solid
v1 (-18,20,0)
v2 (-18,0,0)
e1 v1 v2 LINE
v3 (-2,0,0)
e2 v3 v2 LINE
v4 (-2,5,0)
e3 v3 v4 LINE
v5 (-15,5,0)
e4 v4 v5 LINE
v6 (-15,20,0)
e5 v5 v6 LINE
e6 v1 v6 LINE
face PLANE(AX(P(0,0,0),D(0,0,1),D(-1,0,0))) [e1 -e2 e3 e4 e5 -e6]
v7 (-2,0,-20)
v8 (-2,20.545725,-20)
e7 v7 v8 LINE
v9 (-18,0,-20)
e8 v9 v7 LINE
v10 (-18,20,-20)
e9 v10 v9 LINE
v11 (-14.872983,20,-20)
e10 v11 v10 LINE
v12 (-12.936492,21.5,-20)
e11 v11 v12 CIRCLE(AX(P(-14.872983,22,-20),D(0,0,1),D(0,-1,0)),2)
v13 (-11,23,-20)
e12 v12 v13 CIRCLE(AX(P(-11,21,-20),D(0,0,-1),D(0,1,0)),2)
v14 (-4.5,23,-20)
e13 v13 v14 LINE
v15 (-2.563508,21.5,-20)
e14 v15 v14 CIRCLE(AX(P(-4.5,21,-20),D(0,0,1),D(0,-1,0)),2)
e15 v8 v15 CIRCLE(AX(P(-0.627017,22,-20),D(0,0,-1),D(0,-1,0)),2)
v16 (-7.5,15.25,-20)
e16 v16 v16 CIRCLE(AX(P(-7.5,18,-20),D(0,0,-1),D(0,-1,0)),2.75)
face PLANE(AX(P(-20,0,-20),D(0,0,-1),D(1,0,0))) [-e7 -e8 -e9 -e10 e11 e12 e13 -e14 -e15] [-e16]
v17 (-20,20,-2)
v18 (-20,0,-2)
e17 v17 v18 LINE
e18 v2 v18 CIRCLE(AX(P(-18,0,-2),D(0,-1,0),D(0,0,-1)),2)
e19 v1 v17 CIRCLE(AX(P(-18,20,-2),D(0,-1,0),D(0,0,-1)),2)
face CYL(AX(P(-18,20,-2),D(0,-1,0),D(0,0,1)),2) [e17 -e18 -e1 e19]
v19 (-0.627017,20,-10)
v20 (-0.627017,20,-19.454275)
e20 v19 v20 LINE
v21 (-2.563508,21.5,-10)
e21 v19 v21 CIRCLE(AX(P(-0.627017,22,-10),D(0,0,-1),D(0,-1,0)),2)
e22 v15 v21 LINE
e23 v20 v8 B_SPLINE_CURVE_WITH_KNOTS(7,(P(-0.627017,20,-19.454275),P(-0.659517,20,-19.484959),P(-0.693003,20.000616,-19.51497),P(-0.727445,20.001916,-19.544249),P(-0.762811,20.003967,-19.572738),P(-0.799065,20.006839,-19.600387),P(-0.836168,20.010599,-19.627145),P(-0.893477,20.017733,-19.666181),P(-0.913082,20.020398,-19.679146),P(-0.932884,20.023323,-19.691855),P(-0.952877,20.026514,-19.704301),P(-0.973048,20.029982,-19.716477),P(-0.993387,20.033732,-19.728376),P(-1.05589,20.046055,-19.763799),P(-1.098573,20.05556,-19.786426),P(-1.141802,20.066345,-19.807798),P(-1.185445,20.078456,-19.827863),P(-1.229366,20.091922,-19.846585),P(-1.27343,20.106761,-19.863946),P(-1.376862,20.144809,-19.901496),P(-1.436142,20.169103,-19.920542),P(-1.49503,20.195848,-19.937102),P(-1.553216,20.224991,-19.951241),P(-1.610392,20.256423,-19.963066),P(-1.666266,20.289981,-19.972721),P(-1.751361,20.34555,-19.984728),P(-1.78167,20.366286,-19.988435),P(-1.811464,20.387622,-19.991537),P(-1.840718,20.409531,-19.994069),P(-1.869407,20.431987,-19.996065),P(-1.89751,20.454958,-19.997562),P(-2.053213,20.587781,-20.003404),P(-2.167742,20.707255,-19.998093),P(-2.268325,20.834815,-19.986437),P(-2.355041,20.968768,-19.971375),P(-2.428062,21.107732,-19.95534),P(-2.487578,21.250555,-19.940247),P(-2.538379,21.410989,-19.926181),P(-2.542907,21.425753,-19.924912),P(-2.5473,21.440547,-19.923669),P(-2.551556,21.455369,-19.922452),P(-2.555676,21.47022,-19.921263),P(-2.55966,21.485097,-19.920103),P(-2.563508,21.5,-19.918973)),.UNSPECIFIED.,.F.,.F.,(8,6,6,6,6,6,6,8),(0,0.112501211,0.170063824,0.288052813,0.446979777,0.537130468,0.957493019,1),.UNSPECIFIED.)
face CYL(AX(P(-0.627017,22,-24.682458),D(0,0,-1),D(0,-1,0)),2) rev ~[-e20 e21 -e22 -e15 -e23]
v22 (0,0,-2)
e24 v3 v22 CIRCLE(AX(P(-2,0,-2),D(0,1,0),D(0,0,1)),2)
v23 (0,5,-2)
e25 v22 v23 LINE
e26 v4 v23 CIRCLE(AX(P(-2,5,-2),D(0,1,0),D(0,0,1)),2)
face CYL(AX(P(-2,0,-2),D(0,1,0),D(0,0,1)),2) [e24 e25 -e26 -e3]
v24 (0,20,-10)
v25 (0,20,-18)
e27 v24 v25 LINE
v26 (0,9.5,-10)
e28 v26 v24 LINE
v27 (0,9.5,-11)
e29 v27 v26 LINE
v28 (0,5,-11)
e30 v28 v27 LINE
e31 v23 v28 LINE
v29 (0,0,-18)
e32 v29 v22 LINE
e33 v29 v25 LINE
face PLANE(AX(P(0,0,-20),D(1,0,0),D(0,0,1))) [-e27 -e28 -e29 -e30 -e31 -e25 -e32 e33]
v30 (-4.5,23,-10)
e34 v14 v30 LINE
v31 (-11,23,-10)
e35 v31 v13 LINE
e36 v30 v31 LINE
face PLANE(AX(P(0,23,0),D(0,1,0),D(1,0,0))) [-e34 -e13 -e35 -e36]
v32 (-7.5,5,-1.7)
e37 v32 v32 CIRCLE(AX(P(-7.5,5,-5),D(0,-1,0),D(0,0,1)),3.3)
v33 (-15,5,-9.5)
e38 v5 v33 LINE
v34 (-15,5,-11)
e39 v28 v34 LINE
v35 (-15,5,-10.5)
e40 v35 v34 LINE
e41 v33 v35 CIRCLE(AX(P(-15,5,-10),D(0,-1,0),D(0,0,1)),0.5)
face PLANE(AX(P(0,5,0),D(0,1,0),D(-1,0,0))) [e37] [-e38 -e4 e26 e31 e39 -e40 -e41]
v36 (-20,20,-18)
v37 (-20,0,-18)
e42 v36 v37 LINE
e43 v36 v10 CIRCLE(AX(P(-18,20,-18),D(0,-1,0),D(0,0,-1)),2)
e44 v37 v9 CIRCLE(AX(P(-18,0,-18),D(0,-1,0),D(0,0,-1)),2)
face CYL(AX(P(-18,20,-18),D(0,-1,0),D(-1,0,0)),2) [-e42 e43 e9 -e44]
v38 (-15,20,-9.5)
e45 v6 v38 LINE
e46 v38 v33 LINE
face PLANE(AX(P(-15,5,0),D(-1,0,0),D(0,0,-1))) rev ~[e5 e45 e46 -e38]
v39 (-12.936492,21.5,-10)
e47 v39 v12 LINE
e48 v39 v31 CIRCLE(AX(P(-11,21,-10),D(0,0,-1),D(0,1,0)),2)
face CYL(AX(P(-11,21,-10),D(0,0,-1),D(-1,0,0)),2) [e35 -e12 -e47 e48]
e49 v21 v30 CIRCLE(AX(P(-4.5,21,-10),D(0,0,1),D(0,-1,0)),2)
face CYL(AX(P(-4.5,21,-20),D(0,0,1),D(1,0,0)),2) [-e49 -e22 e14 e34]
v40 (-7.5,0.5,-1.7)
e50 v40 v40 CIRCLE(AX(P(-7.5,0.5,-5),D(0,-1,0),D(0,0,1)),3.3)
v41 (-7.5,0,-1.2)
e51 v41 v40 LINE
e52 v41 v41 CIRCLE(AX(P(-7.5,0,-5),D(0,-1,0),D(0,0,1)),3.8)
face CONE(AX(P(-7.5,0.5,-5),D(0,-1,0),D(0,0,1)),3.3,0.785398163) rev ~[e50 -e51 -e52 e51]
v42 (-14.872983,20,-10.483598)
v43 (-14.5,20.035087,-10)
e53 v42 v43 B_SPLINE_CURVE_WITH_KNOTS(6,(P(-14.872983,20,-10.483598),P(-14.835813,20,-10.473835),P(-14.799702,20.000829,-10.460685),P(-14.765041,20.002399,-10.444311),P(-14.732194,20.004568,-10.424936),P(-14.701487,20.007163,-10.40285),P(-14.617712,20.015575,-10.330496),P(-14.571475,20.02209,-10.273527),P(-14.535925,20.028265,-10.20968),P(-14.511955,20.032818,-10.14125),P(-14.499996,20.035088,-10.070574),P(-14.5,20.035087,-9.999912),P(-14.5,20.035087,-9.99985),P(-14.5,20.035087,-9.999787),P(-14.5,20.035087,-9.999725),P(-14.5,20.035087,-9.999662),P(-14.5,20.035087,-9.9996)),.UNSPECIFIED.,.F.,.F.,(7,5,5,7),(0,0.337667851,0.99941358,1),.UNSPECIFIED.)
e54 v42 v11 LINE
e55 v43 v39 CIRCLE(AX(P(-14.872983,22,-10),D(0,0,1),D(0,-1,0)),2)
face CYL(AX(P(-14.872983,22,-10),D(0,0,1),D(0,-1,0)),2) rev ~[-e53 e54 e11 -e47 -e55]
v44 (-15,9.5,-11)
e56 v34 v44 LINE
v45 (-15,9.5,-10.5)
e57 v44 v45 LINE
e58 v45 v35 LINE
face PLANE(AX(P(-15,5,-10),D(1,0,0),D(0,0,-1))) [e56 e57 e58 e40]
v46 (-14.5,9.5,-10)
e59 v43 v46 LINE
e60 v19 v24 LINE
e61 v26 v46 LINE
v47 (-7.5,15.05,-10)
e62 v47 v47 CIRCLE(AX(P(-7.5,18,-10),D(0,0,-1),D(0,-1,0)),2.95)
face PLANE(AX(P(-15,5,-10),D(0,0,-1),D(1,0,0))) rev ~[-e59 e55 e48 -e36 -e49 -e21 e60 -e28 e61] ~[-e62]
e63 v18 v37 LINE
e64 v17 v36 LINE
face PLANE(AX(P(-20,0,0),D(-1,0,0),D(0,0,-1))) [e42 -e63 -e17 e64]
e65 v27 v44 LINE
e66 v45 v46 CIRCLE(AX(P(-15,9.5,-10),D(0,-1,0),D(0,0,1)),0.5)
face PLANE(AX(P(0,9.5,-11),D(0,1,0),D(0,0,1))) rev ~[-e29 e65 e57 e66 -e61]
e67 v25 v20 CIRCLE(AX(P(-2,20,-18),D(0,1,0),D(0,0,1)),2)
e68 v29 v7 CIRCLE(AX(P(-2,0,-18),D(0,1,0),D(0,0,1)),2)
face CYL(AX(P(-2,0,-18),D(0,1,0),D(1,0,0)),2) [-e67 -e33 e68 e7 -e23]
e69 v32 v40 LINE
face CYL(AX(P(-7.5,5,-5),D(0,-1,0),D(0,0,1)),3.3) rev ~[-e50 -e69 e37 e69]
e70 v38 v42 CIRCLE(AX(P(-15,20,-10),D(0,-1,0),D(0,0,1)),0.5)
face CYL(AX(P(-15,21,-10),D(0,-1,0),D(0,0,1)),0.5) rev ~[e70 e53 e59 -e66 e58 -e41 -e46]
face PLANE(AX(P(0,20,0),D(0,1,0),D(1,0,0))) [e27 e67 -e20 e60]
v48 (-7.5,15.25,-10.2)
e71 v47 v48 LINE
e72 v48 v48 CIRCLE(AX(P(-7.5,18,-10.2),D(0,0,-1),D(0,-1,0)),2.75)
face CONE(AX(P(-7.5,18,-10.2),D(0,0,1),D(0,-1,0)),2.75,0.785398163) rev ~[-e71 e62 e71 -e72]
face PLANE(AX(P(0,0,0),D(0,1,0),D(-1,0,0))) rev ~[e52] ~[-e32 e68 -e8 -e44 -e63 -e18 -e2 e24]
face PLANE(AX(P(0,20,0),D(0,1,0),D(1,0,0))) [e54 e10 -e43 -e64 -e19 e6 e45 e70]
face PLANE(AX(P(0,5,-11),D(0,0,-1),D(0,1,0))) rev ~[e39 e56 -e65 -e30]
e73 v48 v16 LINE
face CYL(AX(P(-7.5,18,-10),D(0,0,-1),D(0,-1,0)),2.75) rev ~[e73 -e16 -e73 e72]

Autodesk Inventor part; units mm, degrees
ref_plane "YZ Plane" through (0, 0, 0) normal (1, 0, 0) x (0, 1, 0)
ref_plane "XZ Plane" through (0, 0, 0) normal (0, 1, 0) x (-1, 0, 0)
sketch "Sketch1" plane through (0, 0, 0) normal (0, 1, 0) x (-1, 0, 0)
  line L0 (0, 0) -> (20, 0)
  line L1 (20, 0) -> (20, -20)
  line L2 (20, -20) -> (0, -20)
  line L3 (0, -20) -> (0, 0)
  dimension "d0" = 20
  dimension "d1" = 20
extrude "Extrusion1" add sketch "Sketch1" along normal blind 5
sketch "Sketch2" plane through (0, 5, 0) normal (0, 1, 0) x (1, 0, 0)
  line L0 (0, 0) -> (0, 20) projected
  line L1 (-20, 0) -> (0, 0) projected
  point P0 (-7.5, 5)
  dimension "d4" = 7.5
  dimension "d55" = 5
hole "Hole1" at (-7.5, 5, -5) direction (0, -1, 0) diameter 6.6 end through all clearance for "Countersunk Flat Head Screw ISO 2009/7046" size "M6" standard "ISO"
chamfer "Chamfer1" distance 0.5 angle 45 1 edges at (-7.5, 0, -8.3)
sketch "Sketch3" plane through (0, 5, 0) normal (0, 1, 0) x (1, 0, 0)
  circle A0 centre (-7.5, 5) radius 3.3 construction
  line L0 (0, 20) -> (-20, 20) construction
  line L1 (-20, 20) -> (-20, 0) construction
  line L2 (-20, 0) -> (0, 0) construction
  line L3 (0, 0) -> (0, 20) construction
  line L4 (-20, 20) -> (-20, 0) construction
  line L5 (0, 20) -> (-20, 20) construction
  line L6 (-20, 0) -> (-15, 0)
  line L7 (-15, 0) -> (-15, 20)
  line L8 (-15, 20) -> (-20, 20)
  line L9 (-20, 20) -> (-20, 0)
  line L10 (0, 20) -> (-20, 20)
  line L11 (-20, 20) -> (-20, 10)
  line L12 (-20, 10) -> (0, 10)
  line L13 (0, 10) -> (0, 20)
  point P0 (-15, 10)
  dimension "d56" = 15
  dimension "d57" = 10
extrude "Extrusion2" add sketch "Sketch3" along normal blind 15
sketch "Sketch6" plane through (0, 20, 0) normal (0, 1, 0) x (1, 0, 0)
  line L0 (0, 20) -> (-20, 20) construction
  line L1 (-20, 20) -> (-20, 0) construction
  line L2 (-20, 0) -> (-15, 0) construction
  line L3 (-15, 0) -> (-15, 10) construction
  line L4 (-15, 10) -> (0, 10) construction
  line L5 (0, 10) -> (0, 20) construction
  line L6 (-2.5, 10) -> (-13, 10)
  line L7 (-13, 10) -> (-13, 20)
  line L8 (-13, 20) -> (-2.5, 20)
  line L9 (-2.5, 20) -> (-2.5, 10)
  dimension "d32" = 2.5
  dimension "d33" = 10.5
  dimension "d34" = 2
extrude "Extrusion5" add sketch "Sketch6" along normal blind 3
fillet "Fillet4" radius 2 6 edges at (-13, 23, -15) (-2.5, 23, -15) (0, 2.5, 0) (-20, 10, 0) (0, 10, -20) (-20, 10, -20)
sketch "Sketch7" plane through (0, 5, -10) normal (0, 0, 1) x (1, 0, 0)
  line L0 (-11, 18) -> (-4.5, 18) projected
  line L1 (0, 0) -> (0, 15) projected
  point P0 (0, -5)
  point P1 (-7.5, 13)
  dimension "d36" = 5
  dimension "d58" = 7.5
hole "Hole2" at (-7.5, 18, -10) direction (0, 0, -1) diameter 5.5 end through all clearance for "Countersunk Flat Head Screw ISO 2009/7046" size "M5" standard "ISO"
fillet "Fillet5" radius 2 2 edges at (-2.5, 20, -15) (-13, 20, -15)
chamfer "Chamfer2" distance 0.2 angle 45 1 edges at (-7.5, 20.75, -10)
ref_plane "Work Plane1" through (0, 21, 0) normal (0, 1, 0) x (1, 0, 0)
sketch "Sketch9" plane through (0, 21, 0) normal (0, 1, 0) x (1, 0, 0)
  line L0 (-15, 10) -> (-15, 0) projected
  point P0 (0, 0)
hole "Hole4" at (-15, 21, -10) direction (0, -1, 0) diameter 1 depth 16
sketch "Sketch10" plane through (0, 5, -10) normal (1, 0, 0) x (0, 0, -1)
  line L0 (8, 15) -> (8, -5) construction
  line L1 (0, 15) -> (8, 15) construction
  line L2 (0, 0) -> (0, 15) construction
  line L3 (-8, 0) -> (0, 0) construction
  line L4 (-8, -5) -> (-8, 0) construction
  line L5 (-8, -5) -> (8, -5) construction
  line L6 (0, 0) -> (1, 0)
  line L7 (1, 0) -> (1, 4.5)
  line L8 (1, 4.5) -> (0, 4.5)
  line L9 (0, 4.5) -> (0, 0)
  point P0 (-10, -5)
  dimension "d67" = 1
  dimension "d68" = 4.5
extrude "Extrusion6" cut sketch "Sketch10" against normal up to surface (15 mm away)
properties part number "KN-00-02-08" material "X5CrNi18-10"
